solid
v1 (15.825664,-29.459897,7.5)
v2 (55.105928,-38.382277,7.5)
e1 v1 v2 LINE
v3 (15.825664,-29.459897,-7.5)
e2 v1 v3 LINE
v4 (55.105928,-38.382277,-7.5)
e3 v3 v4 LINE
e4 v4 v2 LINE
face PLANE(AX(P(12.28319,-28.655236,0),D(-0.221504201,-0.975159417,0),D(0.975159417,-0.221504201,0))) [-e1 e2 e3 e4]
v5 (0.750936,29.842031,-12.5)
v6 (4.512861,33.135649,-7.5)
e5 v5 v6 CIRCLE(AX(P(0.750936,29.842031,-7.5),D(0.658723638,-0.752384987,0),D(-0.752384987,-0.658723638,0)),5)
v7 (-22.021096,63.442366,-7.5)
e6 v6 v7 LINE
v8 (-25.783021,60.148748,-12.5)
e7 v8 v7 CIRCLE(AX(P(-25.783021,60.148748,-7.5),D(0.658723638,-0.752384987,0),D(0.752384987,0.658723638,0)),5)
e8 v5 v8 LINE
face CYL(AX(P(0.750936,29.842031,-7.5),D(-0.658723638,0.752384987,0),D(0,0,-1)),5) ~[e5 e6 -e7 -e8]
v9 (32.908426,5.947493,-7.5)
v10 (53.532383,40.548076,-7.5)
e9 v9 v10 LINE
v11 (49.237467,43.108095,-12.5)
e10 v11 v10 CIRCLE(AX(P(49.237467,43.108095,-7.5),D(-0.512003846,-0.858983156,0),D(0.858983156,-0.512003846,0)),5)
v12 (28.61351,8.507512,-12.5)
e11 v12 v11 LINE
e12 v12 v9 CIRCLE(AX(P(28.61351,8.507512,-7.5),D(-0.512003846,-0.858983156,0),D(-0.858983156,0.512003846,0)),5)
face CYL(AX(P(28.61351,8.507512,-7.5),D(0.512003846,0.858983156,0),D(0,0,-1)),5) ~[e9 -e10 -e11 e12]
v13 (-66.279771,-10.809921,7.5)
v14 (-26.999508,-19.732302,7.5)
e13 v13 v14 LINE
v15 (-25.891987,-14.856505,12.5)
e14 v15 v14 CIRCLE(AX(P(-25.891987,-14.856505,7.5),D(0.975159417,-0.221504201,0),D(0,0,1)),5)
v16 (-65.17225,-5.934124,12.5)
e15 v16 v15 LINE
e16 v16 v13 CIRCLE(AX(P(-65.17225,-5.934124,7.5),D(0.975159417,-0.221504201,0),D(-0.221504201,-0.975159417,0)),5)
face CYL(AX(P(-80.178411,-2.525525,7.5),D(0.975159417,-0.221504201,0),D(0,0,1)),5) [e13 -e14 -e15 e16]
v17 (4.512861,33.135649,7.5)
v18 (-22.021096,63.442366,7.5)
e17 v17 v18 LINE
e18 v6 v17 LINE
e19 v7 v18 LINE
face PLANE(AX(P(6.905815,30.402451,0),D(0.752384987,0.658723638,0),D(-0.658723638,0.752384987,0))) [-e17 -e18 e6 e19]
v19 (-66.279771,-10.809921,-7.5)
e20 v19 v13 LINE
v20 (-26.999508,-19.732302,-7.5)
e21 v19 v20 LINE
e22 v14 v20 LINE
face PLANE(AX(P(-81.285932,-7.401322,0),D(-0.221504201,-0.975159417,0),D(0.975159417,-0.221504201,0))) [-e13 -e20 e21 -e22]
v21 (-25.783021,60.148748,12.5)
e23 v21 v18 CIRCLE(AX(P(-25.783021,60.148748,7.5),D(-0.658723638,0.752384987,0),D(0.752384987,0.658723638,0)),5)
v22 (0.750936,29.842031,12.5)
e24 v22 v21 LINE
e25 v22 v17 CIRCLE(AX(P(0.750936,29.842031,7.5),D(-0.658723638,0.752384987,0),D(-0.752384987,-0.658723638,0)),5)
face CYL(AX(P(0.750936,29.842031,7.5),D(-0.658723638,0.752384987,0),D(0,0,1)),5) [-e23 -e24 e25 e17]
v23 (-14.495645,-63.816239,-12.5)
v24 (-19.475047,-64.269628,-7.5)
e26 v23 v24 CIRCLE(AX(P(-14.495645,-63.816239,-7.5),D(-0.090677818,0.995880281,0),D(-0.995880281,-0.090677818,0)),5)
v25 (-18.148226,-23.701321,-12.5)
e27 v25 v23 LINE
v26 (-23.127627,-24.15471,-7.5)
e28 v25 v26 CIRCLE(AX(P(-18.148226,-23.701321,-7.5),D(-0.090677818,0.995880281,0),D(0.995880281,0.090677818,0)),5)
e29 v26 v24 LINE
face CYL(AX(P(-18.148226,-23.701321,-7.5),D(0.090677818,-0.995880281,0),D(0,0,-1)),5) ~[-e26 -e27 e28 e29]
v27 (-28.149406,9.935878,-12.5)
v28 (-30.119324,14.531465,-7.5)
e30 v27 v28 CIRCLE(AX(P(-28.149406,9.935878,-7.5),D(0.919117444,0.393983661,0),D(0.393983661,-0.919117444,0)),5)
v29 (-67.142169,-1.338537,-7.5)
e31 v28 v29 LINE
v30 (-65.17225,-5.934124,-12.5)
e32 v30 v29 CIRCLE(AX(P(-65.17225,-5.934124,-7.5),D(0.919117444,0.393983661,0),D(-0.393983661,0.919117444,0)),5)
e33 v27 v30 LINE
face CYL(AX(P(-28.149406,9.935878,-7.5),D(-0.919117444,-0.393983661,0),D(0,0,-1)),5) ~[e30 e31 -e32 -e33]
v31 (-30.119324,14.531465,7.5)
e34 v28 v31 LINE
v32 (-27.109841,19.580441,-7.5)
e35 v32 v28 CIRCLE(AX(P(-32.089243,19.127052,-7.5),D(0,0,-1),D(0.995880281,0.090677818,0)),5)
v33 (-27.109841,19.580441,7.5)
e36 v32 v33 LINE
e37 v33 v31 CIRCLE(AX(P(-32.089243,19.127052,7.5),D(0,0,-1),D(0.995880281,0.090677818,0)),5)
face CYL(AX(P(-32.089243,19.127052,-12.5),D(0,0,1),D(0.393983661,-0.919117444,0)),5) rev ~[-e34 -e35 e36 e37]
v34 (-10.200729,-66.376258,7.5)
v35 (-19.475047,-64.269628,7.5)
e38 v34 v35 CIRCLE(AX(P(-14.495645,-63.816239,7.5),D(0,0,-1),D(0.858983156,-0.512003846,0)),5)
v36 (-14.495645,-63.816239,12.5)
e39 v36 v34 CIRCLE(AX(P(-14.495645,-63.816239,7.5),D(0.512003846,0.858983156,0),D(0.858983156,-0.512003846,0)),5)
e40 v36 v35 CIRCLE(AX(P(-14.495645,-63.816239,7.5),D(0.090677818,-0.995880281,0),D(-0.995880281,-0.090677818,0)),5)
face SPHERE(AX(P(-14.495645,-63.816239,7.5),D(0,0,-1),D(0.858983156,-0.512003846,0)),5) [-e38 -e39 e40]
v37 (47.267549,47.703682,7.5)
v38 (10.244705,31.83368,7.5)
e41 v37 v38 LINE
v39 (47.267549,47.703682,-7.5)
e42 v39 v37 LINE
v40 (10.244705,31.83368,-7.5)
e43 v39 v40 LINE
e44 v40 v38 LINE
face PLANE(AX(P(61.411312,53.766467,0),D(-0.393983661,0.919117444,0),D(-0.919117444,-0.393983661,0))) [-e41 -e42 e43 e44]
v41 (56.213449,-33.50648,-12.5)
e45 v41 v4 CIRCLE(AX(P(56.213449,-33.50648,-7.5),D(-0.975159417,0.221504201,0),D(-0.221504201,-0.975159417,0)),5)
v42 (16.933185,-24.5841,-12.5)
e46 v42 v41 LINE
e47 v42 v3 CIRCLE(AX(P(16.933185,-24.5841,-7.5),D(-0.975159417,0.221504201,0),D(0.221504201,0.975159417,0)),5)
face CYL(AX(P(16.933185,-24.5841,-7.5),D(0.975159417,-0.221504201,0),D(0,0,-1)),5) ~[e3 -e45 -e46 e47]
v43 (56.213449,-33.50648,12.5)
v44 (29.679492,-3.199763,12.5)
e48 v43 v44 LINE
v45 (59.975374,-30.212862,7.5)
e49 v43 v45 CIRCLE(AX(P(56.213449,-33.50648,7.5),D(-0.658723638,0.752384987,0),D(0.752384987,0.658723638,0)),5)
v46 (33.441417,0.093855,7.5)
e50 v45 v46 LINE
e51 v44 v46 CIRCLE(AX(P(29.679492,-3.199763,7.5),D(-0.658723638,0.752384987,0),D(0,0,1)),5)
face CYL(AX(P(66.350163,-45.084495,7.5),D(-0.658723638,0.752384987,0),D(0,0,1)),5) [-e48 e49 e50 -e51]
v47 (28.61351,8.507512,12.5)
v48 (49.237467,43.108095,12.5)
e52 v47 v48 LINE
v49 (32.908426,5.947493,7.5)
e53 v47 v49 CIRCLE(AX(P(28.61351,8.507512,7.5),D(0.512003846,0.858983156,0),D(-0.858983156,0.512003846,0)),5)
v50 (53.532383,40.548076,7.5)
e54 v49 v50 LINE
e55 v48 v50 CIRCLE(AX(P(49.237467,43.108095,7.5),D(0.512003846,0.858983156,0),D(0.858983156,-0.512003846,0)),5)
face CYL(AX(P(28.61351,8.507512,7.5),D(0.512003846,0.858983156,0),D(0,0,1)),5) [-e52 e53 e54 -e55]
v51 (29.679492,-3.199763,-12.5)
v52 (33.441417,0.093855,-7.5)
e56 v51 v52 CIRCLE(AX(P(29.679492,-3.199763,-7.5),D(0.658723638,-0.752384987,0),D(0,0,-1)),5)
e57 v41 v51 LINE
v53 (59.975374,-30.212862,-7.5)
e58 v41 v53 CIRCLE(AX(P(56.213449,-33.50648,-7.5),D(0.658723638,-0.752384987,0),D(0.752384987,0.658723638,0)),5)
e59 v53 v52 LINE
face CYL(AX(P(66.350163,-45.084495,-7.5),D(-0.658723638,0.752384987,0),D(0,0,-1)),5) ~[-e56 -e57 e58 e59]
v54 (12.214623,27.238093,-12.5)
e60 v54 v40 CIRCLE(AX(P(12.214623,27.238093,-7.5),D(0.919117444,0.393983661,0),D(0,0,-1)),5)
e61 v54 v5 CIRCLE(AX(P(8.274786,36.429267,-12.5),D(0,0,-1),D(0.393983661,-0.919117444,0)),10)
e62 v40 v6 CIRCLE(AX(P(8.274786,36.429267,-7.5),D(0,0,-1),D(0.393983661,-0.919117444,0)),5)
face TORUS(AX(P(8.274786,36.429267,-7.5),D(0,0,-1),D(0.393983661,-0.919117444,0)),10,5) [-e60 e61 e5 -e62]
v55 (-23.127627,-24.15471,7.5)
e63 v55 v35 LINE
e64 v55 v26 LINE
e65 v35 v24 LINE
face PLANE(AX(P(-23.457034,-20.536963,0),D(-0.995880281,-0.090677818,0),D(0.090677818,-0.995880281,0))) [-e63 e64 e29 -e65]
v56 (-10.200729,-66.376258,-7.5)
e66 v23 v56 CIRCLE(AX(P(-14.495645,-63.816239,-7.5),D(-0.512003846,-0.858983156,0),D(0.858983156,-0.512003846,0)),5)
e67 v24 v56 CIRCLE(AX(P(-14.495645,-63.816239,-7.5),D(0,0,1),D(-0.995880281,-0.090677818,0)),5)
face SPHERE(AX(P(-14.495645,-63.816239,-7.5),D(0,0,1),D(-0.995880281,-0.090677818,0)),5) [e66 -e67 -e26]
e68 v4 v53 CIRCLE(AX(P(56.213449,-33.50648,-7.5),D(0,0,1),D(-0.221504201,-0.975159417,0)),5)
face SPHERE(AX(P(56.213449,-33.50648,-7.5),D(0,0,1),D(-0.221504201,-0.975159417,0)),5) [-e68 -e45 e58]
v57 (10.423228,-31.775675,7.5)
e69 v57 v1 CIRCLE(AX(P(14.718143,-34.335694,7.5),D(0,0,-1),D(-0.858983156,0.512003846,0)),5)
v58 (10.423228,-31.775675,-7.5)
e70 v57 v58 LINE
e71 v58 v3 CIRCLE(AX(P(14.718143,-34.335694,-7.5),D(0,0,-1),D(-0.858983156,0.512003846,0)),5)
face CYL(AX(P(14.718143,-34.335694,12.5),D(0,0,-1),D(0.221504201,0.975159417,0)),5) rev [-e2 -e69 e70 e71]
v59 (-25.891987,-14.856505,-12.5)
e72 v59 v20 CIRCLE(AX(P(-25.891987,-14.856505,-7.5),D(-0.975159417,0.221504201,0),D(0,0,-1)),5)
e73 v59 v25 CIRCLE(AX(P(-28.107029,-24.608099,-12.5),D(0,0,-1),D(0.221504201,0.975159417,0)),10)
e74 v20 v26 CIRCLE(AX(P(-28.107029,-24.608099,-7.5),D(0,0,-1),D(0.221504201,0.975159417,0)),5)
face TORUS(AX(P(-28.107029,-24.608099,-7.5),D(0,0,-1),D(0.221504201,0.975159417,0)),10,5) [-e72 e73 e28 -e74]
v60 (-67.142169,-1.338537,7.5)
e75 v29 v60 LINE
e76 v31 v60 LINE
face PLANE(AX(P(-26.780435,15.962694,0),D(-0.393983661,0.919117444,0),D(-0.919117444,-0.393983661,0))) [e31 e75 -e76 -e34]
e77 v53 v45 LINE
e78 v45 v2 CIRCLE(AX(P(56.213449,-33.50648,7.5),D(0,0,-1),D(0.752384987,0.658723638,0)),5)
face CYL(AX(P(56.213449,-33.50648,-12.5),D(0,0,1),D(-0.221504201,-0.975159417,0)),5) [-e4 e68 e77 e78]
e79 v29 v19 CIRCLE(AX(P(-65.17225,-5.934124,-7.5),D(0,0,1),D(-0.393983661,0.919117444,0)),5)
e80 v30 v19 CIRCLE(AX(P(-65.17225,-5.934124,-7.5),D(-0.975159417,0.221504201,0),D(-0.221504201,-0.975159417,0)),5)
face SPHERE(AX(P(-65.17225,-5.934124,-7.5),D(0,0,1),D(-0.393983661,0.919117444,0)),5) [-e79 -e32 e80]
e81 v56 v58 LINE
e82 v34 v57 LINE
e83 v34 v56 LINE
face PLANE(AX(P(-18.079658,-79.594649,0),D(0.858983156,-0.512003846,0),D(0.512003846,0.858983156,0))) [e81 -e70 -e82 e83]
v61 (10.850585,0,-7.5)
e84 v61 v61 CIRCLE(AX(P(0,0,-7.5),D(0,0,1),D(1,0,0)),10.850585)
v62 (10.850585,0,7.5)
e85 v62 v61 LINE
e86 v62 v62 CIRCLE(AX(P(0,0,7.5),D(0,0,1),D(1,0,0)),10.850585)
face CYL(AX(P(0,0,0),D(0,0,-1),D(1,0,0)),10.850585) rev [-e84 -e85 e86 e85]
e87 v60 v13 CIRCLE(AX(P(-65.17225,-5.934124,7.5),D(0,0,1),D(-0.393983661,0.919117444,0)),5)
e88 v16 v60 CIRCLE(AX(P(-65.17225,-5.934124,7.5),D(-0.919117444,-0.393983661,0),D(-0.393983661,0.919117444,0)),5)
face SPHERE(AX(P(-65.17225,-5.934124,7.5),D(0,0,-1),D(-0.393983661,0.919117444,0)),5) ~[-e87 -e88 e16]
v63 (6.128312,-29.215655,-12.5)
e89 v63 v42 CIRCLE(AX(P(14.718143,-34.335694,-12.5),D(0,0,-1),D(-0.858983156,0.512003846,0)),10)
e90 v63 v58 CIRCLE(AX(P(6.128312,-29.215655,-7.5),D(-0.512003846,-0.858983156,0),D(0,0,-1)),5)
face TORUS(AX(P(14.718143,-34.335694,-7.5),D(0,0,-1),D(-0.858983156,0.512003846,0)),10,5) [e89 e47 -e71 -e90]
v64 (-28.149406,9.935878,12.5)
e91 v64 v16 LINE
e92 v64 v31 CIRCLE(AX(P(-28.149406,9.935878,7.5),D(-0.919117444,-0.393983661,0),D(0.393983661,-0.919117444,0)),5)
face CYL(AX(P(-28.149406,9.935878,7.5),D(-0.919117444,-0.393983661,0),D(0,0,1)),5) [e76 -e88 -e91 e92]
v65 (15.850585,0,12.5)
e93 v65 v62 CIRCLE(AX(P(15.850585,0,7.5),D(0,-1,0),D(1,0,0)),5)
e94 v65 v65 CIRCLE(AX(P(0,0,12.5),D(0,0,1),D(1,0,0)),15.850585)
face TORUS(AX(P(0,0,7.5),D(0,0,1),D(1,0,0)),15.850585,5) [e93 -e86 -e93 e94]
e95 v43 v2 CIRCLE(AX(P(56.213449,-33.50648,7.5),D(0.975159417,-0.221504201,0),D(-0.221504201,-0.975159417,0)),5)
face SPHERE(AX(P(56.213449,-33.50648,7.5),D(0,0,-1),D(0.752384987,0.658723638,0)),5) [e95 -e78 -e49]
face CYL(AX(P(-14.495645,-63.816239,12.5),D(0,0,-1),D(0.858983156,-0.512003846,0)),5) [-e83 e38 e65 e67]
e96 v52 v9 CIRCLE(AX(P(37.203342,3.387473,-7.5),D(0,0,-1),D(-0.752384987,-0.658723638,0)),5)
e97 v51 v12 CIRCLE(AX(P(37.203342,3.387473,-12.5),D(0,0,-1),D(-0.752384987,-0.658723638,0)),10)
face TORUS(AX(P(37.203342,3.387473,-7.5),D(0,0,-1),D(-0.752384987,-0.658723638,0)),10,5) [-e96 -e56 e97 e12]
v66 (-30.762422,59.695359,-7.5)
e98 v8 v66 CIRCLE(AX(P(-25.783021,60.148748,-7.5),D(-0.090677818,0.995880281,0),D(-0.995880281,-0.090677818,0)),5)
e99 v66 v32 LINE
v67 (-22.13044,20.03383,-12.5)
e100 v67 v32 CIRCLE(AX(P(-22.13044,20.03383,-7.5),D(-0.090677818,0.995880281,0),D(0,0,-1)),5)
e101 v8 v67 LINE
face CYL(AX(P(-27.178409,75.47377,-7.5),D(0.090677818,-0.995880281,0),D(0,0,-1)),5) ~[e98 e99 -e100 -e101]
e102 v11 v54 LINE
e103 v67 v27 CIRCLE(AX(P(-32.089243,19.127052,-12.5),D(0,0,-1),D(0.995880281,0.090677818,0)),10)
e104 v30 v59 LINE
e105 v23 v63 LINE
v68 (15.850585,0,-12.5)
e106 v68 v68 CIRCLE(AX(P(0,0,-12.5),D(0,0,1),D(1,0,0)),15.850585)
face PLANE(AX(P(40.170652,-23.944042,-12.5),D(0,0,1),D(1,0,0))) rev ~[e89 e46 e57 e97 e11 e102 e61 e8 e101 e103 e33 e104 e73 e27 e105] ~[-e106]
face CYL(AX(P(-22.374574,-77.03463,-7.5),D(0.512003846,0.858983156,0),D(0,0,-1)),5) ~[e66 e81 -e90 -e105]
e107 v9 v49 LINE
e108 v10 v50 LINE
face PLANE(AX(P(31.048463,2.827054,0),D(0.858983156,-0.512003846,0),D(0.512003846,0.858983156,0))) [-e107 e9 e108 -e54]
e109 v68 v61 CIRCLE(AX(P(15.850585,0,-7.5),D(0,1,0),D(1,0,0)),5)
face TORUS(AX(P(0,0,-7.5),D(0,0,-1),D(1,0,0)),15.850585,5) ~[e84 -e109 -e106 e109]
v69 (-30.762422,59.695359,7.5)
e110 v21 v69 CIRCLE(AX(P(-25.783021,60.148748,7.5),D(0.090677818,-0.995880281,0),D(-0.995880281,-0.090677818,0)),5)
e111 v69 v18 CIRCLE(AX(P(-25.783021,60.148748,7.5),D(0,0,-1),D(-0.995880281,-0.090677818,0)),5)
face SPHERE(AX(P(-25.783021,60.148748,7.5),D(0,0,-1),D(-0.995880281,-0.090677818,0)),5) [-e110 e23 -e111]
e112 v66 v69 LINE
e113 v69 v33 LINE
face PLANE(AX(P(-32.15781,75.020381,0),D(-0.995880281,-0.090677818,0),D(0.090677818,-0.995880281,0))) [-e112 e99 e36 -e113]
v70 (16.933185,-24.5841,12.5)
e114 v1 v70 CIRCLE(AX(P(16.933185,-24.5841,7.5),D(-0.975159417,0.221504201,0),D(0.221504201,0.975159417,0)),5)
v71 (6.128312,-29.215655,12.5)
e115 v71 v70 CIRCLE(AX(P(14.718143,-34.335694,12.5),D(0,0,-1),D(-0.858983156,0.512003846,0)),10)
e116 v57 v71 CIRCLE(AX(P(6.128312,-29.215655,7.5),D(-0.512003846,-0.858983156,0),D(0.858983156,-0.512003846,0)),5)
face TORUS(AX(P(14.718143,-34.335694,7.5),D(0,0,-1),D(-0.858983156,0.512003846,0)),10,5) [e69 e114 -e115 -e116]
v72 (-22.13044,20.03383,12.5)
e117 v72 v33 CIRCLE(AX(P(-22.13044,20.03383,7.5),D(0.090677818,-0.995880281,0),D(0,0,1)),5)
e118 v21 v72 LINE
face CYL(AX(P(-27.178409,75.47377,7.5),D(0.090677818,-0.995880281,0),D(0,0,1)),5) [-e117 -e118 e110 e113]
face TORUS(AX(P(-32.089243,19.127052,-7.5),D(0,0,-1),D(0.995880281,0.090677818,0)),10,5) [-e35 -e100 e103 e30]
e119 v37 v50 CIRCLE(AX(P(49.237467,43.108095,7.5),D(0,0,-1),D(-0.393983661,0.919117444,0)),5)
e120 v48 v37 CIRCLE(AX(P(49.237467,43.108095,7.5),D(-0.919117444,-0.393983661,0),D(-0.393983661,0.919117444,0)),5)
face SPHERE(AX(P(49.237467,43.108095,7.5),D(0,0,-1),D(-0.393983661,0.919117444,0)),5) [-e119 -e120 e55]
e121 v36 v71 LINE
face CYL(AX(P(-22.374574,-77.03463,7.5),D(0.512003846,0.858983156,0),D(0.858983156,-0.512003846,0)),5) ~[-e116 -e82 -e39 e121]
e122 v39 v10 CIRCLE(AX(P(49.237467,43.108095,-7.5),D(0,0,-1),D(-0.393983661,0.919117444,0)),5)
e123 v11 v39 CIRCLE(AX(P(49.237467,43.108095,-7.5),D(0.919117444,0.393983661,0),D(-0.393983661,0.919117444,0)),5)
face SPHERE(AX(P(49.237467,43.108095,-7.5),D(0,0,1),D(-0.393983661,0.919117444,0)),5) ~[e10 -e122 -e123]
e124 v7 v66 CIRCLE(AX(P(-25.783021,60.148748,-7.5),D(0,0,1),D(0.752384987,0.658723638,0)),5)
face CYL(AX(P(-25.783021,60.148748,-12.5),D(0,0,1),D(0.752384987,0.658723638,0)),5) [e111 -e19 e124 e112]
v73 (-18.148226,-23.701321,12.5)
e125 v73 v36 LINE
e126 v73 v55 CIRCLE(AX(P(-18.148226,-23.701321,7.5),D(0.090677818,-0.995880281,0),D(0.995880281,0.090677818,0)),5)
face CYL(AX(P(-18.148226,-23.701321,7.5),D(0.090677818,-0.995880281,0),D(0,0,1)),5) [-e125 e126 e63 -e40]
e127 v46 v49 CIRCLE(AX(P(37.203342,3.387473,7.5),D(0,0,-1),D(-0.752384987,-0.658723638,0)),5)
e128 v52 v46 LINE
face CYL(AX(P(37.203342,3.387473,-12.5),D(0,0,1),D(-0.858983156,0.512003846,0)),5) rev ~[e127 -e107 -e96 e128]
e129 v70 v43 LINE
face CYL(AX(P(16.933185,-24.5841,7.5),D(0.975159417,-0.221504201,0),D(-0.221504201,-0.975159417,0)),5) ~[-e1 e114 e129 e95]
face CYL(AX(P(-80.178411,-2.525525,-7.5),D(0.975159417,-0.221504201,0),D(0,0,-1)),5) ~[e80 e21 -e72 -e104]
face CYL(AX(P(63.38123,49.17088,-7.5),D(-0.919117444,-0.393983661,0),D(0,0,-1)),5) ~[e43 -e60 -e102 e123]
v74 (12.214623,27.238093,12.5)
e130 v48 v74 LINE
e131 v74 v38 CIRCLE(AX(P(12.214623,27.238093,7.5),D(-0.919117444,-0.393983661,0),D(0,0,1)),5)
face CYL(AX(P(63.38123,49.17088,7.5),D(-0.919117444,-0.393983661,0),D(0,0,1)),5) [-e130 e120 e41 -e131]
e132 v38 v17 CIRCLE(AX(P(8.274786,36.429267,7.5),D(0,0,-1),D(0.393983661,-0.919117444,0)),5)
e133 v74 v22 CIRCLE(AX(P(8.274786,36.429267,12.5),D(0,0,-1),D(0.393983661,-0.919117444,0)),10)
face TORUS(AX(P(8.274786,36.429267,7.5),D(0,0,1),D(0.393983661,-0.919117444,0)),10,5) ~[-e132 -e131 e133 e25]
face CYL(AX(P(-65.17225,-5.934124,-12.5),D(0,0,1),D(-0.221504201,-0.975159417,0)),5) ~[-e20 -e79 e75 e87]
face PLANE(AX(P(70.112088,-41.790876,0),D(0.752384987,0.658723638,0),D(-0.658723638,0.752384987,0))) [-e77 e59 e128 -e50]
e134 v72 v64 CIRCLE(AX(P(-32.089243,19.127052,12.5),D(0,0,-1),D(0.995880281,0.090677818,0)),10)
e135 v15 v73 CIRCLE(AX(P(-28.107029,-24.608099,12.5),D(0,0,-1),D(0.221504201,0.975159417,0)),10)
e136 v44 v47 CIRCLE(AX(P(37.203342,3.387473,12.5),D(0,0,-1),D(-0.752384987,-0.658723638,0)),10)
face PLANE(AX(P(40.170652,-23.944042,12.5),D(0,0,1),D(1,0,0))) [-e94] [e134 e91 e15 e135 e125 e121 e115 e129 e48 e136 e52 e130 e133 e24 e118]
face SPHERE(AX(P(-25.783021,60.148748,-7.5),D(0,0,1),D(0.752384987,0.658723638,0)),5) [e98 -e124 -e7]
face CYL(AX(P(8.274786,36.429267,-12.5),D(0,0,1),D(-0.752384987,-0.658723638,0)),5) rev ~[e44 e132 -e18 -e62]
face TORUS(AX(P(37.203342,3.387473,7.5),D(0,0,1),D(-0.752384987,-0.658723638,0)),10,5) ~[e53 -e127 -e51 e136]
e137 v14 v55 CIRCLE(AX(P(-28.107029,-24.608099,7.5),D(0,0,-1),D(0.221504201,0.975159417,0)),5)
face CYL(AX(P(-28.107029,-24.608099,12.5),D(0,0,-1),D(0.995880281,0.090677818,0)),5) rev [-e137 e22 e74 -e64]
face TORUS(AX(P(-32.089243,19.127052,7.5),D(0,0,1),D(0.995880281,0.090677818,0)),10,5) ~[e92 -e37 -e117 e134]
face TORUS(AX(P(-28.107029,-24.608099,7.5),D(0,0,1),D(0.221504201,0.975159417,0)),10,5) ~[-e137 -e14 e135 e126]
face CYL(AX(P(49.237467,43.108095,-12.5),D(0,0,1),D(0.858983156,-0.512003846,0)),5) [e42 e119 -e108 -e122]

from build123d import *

# Parameters (mm, degrees)
F0_R     = 10.8505850545
F1_DEPTH = 12.5
F2_F1_R  = 5
F2_F2_R  = 5


with BuildPart() as f1:
    # F0 (on Top) → F1 (new body, symmetric)
    with BuildSketch(Plane.XY):
        Polygon((12.2831904488, -28.6552355439), (70.1120882045, -41.7908763236), (31.0484630838, 2.8270535563), align=None)
        Polygon((-18.079658483, -79.5946493517), (12.2831904488, -28.6552355439), (-23.4570338962, -20.5369630781), align=None)
        Polygon((-23.4570338962, -20.5369630781), (12.2831904488, -28.6552355439), (31.0484630838, 2.8270535563), (6.9058150355, 30.4024507297), (-26.7804346719, 15.962694336), align=None)
        Circle(F0_R, mode=Mode.SUBTRACT)
        Polygon((6.9058150355, 30.4024507297), (31.0484630838, 2.8270535563), (61.4113120156, 53.7664673641), align=None)
        Polygon((-81.2859316519, -7.4013222984), (-23.4570338962, -20.5369630781), (-26.7804346719, 15.962694336), align=None)
        Polygon((-26.7804346719, 15.962694336), (6.9058150355, 30.4024507297), (-32.1578100851, 75.0203806096), align=None)
    extrude(amount=F1_DEPTH, both=True)

    # F2: fillet of radius 5 on 22 edges, made by hand

    # F2_f1
    f2_f1_edges = [f1.edges().sort_by_distance(p)[0] for p in [
        (-23.4570338962, -20.5369630781, 0),
        (12.2831904488, -28.6552355439, 0),
        (31.0484630838, 2.8270535563, 0),
        (6.9058150355, 30.4024507297, 0),
        (-26.7804346719, 15.962694336, 0),
    ]]
    fillet(f2_f1_edges, radius=F2_F1_R)

    # F2_f2
    f2_f2_edges = [f1.edges().sort_by_distance(p)[0] for p in [
        (-81.2859316519, -7.4013222984, 0),
        (-18.079658483, -79.5946493517, 0),
        (70.1120882045, -41.7908763236, 0),
        (61.4113120156, 53.7664673641, 0),
        (-32.1578100851, 75.0203806096, 0),
        (-29.6338256066, 47.3004109145, 12.5),
        (-13.8224743676, 54.0780148962, 12.5),
        (47.1598689714, 29.8569799436, 12.5),
        (42.9688762969, -35.6253864896, 12.5),
        (-54.1427197444, -13.5668121324, 12.5),
        (-13.8224743676, 54.0780148962, -12.5),
        (-29.6338256066, 47.3004109145, -12.5),
        (-54.1427197444, -13.5668121324, -12.5),
        (-3.8282154389, -55.6851619313, -12.5),
        (51.7767524869, -20.8485106102, -12.5),
        (-10.8505850545, 0, 12.5),
        (-10.8505850545, 0, -12.5),
        (32.2239403022, 2.9340842019, -12.5),
        (12.7482250787, -29.7401065238, -12.5),
        (-24.3451039073, -21.3144808627, -12.5),
        (-27.7943267531, 16.5670328981, -12.5),
        (7.1672652795, 31.5534702865, -12.5),
        (-24.3451039073, -21.3144808627, 12.5),
        (12.7482250787, -29.7401065238, 12.5),
        (32.2239403022, 2.9340842019, 12.5),
        (7.1672652795, 31.5534702865, 12.5),
        (-27.7943267531, 16.5670328981, 12.5),
    ]]
    fillet(f2_f2_edges, radius=F2_F2_R)


solid = f1.part
